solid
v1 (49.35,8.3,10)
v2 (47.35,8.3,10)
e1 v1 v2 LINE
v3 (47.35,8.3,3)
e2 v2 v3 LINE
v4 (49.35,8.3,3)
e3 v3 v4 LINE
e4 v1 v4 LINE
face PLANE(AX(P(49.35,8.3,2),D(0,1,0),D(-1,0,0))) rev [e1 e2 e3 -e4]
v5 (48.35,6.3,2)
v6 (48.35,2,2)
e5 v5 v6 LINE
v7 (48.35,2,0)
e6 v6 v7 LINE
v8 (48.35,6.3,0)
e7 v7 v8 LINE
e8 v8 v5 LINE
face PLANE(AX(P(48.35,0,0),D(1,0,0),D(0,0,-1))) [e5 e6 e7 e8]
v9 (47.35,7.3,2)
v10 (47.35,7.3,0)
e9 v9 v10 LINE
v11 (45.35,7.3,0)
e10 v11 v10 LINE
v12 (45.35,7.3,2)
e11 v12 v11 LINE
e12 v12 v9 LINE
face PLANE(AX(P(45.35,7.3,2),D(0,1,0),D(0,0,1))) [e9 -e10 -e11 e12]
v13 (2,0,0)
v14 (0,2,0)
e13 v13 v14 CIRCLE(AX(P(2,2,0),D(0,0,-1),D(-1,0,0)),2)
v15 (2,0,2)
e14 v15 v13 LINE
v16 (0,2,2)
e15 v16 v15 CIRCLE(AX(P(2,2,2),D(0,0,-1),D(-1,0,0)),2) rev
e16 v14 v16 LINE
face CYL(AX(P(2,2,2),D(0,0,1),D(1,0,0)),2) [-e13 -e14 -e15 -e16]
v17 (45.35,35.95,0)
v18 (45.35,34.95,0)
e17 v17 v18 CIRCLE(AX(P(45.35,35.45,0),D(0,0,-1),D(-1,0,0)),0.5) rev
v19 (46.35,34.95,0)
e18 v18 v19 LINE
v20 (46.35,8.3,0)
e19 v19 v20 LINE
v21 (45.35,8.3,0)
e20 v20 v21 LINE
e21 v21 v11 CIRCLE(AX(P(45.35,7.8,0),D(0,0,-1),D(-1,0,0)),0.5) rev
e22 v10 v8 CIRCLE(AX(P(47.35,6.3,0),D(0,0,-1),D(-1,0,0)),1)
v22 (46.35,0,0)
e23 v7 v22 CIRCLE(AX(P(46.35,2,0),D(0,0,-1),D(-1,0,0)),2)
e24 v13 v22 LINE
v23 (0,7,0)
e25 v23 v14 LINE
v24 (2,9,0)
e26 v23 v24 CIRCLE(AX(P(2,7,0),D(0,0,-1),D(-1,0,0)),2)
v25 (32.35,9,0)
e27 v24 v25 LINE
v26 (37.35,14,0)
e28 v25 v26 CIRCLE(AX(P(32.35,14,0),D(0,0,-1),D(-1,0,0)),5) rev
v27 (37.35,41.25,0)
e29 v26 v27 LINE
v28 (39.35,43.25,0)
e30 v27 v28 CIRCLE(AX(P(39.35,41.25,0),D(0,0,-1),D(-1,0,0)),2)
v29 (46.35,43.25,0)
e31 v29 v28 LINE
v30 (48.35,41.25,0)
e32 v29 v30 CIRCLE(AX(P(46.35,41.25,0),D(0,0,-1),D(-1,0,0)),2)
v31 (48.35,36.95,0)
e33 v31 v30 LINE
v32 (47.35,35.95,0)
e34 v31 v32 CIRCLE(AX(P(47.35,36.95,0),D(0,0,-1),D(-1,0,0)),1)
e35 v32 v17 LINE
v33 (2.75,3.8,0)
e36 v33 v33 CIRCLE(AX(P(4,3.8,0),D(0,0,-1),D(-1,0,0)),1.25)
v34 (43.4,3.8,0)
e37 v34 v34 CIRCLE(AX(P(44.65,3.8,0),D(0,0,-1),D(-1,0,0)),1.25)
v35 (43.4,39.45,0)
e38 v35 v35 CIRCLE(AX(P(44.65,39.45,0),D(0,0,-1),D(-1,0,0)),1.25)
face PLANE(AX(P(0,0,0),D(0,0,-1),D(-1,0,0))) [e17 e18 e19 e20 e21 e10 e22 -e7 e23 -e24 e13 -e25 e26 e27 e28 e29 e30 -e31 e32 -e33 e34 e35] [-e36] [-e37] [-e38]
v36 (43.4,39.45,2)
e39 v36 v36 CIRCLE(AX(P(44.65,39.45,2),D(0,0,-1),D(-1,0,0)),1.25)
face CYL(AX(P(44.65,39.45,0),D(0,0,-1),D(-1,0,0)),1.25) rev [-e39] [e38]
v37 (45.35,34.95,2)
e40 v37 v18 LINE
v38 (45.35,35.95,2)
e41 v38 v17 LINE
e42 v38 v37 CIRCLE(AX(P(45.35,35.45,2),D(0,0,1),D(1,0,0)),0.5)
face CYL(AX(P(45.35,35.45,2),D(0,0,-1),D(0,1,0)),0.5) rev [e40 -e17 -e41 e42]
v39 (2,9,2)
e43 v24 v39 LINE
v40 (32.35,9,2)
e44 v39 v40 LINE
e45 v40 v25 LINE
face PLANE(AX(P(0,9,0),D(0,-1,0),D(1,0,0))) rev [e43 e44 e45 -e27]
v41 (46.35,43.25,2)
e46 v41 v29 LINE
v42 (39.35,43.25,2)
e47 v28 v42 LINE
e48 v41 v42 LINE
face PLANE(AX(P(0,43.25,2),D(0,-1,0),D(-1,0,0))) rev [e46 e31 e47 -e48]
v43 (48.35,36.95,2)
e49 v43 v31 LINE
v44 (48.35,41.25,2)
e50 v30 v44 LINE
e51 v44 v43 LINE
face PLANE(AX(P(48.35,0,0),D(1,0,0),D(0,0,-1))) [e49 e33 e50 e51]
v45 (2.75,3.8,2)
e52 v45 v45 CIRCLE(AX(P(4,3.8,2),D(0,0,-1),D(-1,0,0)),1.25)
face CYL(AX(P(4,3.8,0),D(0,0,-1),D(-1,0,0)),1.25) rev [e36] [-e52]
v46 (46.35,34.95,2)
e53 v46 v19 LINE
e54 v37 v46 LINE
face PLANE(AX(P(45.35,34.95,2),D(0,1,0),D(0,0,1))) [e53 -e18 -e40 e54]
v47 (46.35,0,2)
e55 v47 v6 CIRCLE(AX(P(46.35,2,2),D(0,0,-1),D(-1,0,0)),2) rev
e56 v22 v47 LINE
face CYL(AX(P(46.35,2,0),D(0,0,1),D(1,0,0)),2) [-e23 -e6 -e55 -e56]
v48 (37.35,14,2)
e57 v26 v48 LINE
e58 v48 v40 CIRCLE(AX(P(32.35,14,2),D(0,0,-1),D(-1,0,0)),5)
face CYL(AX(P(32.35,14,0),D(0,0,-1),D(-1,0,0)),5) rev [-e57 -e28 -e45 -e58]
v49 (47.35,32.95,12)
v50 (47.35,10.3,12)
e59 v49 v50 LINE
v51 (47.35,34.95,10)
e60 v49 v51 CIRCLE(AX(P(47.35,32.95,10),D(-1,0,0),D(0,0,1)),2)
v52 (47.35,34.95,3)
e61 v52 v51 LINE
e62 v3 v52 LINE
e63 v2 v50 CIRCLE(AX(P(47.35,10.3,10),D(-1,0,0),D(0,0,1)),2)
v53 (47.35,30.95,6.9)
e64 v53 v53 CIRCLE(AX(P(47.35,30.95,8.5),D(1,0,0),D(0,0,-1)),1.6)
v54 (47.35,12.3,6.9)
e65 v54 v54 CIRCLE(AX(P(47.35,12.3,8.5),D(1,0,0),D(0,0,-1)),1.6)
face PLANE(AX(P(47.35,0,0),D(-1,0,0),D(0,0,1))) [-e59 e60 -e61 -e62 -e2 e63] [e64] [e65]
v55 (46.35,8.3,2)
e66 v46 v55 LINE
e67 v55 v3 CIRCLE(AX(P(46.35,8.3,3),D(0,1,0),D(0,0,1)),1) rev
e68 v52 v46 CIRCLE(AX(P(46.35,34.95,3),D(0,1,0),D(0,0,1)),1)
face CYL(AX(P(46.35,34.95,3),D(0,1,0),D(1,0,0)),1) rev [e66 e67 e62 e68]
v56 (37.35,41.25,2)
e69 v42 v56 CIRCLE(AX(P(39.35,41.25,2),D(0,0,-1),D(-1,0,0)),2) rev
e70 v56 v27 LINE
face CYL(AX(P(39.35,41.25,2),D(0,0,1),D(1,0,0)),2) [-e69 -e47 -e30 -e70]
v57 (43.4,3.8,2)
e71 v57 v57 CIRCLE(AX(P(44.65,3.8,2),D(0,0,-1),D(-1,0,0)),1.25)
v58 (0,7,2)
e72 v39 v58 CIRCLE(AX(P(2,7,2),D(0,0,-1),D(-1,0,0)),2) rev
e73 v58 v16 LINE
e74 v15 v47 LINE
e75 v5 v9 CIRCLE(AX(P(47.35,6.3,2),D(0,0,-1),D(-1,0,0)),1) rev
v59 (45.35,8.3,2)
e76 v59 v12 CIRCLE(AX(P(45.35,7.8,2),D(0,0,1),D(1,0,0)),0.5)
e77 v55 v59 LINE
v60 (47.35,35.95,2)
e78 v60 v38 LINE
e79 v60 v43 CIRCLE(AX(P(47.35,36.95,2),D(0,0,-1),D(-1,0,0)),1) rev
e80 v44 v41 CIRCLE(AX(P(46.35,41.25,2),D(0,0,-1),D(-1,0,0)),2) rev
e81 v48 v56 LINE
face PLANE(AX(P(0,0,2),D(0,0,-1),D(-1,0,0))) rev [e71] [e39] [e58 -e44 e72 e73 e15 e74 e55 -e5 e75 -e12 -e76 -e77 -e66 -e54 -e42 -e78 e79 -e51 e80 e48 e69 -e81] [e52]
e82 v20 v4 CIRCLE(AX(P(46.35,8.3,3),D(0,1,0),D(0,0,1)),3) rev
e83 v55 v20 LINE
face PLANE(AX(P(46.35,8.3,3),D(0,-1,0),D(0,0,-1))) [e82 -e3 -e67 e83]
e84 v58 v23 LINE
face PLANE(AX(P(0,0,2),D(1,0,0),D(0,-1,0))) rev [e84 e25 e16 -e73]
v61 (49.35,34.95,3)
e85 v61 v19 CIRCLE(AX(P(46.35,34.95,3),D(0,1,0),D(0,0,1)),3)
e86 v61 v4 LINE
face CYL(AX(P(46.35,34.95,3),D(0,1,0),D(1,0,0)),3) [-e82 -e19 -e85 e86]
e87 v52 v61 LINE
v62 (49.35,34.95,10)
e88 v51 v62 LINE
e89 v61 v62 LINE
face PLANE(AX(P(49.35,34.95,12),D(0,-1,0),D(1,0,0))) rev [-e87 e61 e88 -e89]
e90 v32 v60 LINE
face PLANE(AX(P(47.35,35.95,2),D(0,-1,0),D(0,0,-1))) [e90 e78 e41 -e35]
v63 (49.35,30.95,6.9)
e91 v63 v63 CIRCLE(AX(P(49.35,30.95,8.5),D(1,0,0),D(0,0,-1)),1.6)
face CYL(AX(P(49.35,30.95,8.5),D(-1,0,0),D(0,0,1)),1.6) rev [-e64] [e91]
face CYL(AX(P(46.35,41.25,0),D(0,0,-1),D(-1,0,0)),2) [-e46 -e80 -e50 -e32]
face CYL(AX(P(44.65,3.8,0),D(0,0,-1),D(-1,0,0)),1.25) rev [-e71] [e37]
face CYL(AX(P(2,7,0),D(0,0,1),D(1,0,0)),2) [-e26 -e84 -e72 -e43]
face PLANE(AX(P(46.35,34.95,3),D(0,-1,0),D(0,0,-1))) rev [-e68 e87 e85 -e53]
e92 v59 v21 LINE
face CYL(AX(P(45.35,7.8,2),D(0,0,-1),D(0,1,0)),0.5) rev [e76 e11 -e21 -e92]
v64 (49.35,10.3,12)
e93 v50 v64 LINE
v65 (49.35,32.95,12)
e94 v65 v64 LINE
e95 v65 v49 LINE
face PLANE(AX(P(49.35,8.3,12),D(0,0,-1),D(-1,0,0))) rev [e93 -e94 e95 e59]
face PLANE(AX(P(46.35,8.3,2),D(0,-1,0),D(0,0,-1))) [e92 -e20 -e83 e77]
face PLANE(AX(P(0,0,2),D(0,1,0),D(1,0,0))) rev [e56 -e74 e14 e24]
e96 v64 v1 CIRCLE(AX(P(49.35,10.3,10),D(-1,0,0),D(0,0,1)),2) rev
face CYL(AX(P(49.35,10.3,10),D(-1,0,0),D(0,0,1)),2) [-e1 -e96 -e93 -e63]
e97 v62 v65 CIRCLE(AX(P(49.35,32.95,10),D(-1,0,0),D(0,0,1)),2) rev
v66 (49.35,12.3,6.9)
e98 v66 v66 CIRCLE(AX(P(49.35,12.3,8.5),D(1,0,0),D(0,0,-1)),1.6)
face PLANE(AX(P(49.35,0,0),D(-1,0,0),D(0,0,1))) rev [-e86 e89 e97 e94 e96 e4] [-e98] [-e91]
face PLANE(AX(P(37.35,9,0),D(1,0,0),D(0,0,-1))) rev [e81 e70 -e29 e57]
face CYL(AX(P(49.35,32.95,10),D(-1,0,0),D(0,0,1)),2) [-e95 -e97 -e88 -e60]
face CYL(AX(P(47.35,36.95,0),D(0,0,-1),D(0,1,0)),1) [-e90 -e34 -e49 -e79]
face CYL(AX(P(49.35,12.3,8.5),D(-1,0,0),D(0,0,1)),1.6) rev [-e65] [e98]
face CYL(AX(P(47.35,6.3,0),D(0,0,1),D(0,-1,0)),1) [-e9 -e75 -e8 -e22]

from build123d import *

# Parameters (mm, degrees)
SKETCH1_W                 = 47.35
SKETCH1_H                 = 43.25
BOSS_EXTRUDE2_DEPTH       = 2
EDGE_FLANGE1_START        = -2
EDGE_FLANGE1_OUTLINE_W    = 1
EDGE_FLANGE1_OUTLINE_H    = 2
EDGE_FLANGE1_DEPTH        = 2
EDGE_FLANGE1_START_2      = -1
EDGE_FLANGE1_2_DEPTH      = 3.69178
EDGE_FLANGE1_3_OUTLINE_W  = 2
EDGE_FLANGE1_3_OUTLINE_H  = 26.65
EDGE_FLANGE1_3_DEPTH      = 12
EDGE_FLANGE1_START_3      = 8.3
EDGE_FLANGE1_4_DEPTH      = 26.65
EDGE_FLANGE1_5_DEPTH      = 26.65
EDGE_FLANGE1_START_4      = 47.35
EDGE_FLANGE1_6_OUTLINE_R  = 1.6
EDGE_FLANGE1_6_DEPTH      = 2
REDONDEO1_R               = 2
TALADRO_ROSCADO_M31_D     = 2.5
TALADRO_ROSCADO_M31_DEPTH = 8.5
TALADRO_ROSCADO_M31_TIP   = 0.751075774
CROQUIS4_W                = 37.35
CROQUIS4_H                = 34.25
CORTAR_EXTRUIR1_DEPTH     = 67.377594111
CROQUIS14_W               = 2
CROQUIS14_H               = 7.3
SALIENTE_EXTRUIR1_DEPTH   = 1
FILLET1_R                 = 2
REDONDEO2_R               = 5
REDONDEO3_R               = 1


with BuildPart() as part:
    # Sketch1 → Boss-Extrude2 (new body)
    with BuildSketch(Plane.XY):
        with Locations((23.675, 21.625)):
            Rectangle(SKETCH1_W, SKETCH1_H)
    extrude(amount=BOSS_EXTRUDE2_DEPTH)

    # Edge-Flange1: read off the stored shape, not the designer's step
    # Edge-Flange1 outline → Edge-Flange1 (cut)
    with BuildSketch(Plane(origin=(47.35, 0, 2), x_dir=(0, 1, 0), z_dir=(1, 0, 0)).offset(EDGE_FLANGE1_START)):
        with Locations((35.45, -1)):
            Rectangle(EDGE_FLANGE1_OUTLINE_W, EDGE_FLANGE1_OUTLINE_H)
        with Locations((7.8, -1)):
            Rectangle(EDGE_FLANGE1_OUTLINE_W, EDGE_FLANGE1_OUTLINE_H)
    extrude(amount=EDGE_FLANGE1_DEPTH, mode=Mode.SUBTRACT)

    # Edge-Flange1 2 outline → Edge-Flange1 2 (cut)
    with BuildSketch(Plane.XY.offset(EDGE_FLANGE1_START_2)):
        with BuildLine():
            ThreePointArc((45.35, 35.95), (44.85, 35.45), (45.35, 34.95))
            Line((45.35, 34.95), (45.35, 35.95))
        make_face()
        with BuildLine():
            ThreePointArc((45.35, 8.3), (44.85, 7.8), (45.35, 7.3))
            Line((45.35, 7.3), (45.35, 8.3))
        make_face()
    extrude(amount=EDGE_FLANGE1_2_DEPTH, mode=Mode.SUBTRACT)

    # Edge-Flange1 3 outline → Edge-Flange1 3 (add)
    with BuildSketch(Plane.XY):
        with Locations((48.35, 21.625)):
            Rectangle(EDGE_FLANGE1_3_OUTLINE_W, EDGE_FLANGE1_3_OUTLINE_H)
    extrude(amount=EDGE_FLANGE1_3_DEPTH)

    # Edge-Flange1 4 outline → Edge-Flange1 4 (add)
    with BuildSketch(Plane(origin=(0, 0, 0), x_dir=(1, 0, 0), z_dir=(0, 1, 0)).offset(EDGE_FLANGE1_START_3)):
        with BuildLine():
            ThreePointArc((46.35, -2), (47.057106781, -2.292893219), (47.35, -3))
            Line((47.35, -3), (47.35, -2))
            Line((47.35, -2), (46.35, -2))
        make_face()
    extrude(amount=EDGE_FLANGE1_4_DEPTH)

    # Edge-Flange1 5 outline → Edge-Flange1 5 (cut)
    with BuildSketch(Plane(origin=(0, 0, 0), x_dir=(1, 0, 0), z_dir=(0, 1, 0)).offset(EDGE_FLANGE1_START_3)):
        with BuildLine():
            ThreePointArc((46.35, 0), (48.471320344, -0.878679656), (49.35, -3))
            Line((49.35, -3), (49.35, 0))
            Line((49.35, 0), (46.35, 0))
        make_face()
    extrude(amount=EDGE_FLANGE1_5_DEPTH, mode=Mode.SUBTRACT)

    # Edge-Flange1 6 outline → Edge-Flange1 6 (cut)
    with BuildSketch(Plane.YZ.offset(EDGE_FLANGE1_START_4)):
        with Locations((12.3, 8.5)):
            Circle(EDGE_FLANGE1_6_OUTLINE_R)
        with Locations((30.95, 8.5)):
            Circle(EDGE_FLANGE1_6_OUTLINE_R)
    extrude(amount=EDGE_FLANGE1_6_DEPTH, mode=Mode.SUBTRACT)

    # Redondeo1
    redondeo1_edges = [part.edges().sort_by_distance(p)[0] for p in [
        (48.35, 8.3, 12),
        (48.35, 34.95, 12),
    ]]
    fillet(redondeo1_edges, radius=REDONDEO1_R)

    # Taladro roscado M31
    with Locations(Plane(origin=(0, 0, 0), x_dir=(-1, 0, 0), z_dir=(0, 0, -1))):
        with Locations((-44.65, 39.45), (-4, 3.8), (-44.65, 3.8)):
            Hole(TALADRO_ROSCADO_M31_D / 2, depth=TALADRO_ROSCADO_M31_DEPTH)
            with Locations((0, 0, -(TALADRO_ROSCADO_M31_DEPTH + TALADRO_ROSCADO_M31_TIP / 2))):  # 118° drill point
                Cone(0, TALADRO_ROSCADO_M31_D / 2, TALADRO_ROSCADO_M31_TIP, mode=Mode.SUBTRACT)

    # Croquis4 → Cortar-Extruir1 (cut, through all)
    with BuildSketch(Plane.XY.offset(2)):
        with Locations((18.675, 26.125)):
            Rectangle(CROQUIS4_W, CROQUIS4_H)
    extrude(amount=-CORTAR_EXTRUIR1_DEPTH, mode=Mode.SUBTRACT)

    # Croquis14 → Saliente-Extruir1 (add)
    with BuildSketch(Plane(origin=(47.35, 0, 0), x_dir=(0, 0, -1), z_dir=(1, 0, 0))):
        with Locations((-1, 3.65)):
            Rectangle(CROQUIS14_W, CROQUIS14_H)
        with Locations((-1, 39.6)):
            Rectangle(CROQUIS14_W, CROQUIS14_H)
    extrude(amount=SALIENTE_EXTRUIR1_DEPTH)

    # Fillet1
    fillet1_edges = [part.edges().sort_by_distance(p)[0] for p in [
        (0, 9, 1),
        (37.35, 43.25, 1),
        (48.35, 0, 1),
        (48.35, 43.25, 1),
        (0, 0, 1),
    ]]
    fillet(fillet1_edges, radius=FILLET1_R)

    # Redondeo2
    redondeo2_edges = [part.edges().sort_by_distance(p)[0] for p in [
        (37.35, 9, 1),
    ]]
    fillet(redondeo2_edges, radius=REDONDEO2_R)

    # Redondeo3
    redondeo3_edges = [part.edges().sort_by_distance(p)[0] for p in [
        (48.35, 7.3, 1),
        (48.35, 35.95, 1),
    ]]
    fillet(redondeo3_edges, radius=REDONDEO3_R)


solid = part.part
